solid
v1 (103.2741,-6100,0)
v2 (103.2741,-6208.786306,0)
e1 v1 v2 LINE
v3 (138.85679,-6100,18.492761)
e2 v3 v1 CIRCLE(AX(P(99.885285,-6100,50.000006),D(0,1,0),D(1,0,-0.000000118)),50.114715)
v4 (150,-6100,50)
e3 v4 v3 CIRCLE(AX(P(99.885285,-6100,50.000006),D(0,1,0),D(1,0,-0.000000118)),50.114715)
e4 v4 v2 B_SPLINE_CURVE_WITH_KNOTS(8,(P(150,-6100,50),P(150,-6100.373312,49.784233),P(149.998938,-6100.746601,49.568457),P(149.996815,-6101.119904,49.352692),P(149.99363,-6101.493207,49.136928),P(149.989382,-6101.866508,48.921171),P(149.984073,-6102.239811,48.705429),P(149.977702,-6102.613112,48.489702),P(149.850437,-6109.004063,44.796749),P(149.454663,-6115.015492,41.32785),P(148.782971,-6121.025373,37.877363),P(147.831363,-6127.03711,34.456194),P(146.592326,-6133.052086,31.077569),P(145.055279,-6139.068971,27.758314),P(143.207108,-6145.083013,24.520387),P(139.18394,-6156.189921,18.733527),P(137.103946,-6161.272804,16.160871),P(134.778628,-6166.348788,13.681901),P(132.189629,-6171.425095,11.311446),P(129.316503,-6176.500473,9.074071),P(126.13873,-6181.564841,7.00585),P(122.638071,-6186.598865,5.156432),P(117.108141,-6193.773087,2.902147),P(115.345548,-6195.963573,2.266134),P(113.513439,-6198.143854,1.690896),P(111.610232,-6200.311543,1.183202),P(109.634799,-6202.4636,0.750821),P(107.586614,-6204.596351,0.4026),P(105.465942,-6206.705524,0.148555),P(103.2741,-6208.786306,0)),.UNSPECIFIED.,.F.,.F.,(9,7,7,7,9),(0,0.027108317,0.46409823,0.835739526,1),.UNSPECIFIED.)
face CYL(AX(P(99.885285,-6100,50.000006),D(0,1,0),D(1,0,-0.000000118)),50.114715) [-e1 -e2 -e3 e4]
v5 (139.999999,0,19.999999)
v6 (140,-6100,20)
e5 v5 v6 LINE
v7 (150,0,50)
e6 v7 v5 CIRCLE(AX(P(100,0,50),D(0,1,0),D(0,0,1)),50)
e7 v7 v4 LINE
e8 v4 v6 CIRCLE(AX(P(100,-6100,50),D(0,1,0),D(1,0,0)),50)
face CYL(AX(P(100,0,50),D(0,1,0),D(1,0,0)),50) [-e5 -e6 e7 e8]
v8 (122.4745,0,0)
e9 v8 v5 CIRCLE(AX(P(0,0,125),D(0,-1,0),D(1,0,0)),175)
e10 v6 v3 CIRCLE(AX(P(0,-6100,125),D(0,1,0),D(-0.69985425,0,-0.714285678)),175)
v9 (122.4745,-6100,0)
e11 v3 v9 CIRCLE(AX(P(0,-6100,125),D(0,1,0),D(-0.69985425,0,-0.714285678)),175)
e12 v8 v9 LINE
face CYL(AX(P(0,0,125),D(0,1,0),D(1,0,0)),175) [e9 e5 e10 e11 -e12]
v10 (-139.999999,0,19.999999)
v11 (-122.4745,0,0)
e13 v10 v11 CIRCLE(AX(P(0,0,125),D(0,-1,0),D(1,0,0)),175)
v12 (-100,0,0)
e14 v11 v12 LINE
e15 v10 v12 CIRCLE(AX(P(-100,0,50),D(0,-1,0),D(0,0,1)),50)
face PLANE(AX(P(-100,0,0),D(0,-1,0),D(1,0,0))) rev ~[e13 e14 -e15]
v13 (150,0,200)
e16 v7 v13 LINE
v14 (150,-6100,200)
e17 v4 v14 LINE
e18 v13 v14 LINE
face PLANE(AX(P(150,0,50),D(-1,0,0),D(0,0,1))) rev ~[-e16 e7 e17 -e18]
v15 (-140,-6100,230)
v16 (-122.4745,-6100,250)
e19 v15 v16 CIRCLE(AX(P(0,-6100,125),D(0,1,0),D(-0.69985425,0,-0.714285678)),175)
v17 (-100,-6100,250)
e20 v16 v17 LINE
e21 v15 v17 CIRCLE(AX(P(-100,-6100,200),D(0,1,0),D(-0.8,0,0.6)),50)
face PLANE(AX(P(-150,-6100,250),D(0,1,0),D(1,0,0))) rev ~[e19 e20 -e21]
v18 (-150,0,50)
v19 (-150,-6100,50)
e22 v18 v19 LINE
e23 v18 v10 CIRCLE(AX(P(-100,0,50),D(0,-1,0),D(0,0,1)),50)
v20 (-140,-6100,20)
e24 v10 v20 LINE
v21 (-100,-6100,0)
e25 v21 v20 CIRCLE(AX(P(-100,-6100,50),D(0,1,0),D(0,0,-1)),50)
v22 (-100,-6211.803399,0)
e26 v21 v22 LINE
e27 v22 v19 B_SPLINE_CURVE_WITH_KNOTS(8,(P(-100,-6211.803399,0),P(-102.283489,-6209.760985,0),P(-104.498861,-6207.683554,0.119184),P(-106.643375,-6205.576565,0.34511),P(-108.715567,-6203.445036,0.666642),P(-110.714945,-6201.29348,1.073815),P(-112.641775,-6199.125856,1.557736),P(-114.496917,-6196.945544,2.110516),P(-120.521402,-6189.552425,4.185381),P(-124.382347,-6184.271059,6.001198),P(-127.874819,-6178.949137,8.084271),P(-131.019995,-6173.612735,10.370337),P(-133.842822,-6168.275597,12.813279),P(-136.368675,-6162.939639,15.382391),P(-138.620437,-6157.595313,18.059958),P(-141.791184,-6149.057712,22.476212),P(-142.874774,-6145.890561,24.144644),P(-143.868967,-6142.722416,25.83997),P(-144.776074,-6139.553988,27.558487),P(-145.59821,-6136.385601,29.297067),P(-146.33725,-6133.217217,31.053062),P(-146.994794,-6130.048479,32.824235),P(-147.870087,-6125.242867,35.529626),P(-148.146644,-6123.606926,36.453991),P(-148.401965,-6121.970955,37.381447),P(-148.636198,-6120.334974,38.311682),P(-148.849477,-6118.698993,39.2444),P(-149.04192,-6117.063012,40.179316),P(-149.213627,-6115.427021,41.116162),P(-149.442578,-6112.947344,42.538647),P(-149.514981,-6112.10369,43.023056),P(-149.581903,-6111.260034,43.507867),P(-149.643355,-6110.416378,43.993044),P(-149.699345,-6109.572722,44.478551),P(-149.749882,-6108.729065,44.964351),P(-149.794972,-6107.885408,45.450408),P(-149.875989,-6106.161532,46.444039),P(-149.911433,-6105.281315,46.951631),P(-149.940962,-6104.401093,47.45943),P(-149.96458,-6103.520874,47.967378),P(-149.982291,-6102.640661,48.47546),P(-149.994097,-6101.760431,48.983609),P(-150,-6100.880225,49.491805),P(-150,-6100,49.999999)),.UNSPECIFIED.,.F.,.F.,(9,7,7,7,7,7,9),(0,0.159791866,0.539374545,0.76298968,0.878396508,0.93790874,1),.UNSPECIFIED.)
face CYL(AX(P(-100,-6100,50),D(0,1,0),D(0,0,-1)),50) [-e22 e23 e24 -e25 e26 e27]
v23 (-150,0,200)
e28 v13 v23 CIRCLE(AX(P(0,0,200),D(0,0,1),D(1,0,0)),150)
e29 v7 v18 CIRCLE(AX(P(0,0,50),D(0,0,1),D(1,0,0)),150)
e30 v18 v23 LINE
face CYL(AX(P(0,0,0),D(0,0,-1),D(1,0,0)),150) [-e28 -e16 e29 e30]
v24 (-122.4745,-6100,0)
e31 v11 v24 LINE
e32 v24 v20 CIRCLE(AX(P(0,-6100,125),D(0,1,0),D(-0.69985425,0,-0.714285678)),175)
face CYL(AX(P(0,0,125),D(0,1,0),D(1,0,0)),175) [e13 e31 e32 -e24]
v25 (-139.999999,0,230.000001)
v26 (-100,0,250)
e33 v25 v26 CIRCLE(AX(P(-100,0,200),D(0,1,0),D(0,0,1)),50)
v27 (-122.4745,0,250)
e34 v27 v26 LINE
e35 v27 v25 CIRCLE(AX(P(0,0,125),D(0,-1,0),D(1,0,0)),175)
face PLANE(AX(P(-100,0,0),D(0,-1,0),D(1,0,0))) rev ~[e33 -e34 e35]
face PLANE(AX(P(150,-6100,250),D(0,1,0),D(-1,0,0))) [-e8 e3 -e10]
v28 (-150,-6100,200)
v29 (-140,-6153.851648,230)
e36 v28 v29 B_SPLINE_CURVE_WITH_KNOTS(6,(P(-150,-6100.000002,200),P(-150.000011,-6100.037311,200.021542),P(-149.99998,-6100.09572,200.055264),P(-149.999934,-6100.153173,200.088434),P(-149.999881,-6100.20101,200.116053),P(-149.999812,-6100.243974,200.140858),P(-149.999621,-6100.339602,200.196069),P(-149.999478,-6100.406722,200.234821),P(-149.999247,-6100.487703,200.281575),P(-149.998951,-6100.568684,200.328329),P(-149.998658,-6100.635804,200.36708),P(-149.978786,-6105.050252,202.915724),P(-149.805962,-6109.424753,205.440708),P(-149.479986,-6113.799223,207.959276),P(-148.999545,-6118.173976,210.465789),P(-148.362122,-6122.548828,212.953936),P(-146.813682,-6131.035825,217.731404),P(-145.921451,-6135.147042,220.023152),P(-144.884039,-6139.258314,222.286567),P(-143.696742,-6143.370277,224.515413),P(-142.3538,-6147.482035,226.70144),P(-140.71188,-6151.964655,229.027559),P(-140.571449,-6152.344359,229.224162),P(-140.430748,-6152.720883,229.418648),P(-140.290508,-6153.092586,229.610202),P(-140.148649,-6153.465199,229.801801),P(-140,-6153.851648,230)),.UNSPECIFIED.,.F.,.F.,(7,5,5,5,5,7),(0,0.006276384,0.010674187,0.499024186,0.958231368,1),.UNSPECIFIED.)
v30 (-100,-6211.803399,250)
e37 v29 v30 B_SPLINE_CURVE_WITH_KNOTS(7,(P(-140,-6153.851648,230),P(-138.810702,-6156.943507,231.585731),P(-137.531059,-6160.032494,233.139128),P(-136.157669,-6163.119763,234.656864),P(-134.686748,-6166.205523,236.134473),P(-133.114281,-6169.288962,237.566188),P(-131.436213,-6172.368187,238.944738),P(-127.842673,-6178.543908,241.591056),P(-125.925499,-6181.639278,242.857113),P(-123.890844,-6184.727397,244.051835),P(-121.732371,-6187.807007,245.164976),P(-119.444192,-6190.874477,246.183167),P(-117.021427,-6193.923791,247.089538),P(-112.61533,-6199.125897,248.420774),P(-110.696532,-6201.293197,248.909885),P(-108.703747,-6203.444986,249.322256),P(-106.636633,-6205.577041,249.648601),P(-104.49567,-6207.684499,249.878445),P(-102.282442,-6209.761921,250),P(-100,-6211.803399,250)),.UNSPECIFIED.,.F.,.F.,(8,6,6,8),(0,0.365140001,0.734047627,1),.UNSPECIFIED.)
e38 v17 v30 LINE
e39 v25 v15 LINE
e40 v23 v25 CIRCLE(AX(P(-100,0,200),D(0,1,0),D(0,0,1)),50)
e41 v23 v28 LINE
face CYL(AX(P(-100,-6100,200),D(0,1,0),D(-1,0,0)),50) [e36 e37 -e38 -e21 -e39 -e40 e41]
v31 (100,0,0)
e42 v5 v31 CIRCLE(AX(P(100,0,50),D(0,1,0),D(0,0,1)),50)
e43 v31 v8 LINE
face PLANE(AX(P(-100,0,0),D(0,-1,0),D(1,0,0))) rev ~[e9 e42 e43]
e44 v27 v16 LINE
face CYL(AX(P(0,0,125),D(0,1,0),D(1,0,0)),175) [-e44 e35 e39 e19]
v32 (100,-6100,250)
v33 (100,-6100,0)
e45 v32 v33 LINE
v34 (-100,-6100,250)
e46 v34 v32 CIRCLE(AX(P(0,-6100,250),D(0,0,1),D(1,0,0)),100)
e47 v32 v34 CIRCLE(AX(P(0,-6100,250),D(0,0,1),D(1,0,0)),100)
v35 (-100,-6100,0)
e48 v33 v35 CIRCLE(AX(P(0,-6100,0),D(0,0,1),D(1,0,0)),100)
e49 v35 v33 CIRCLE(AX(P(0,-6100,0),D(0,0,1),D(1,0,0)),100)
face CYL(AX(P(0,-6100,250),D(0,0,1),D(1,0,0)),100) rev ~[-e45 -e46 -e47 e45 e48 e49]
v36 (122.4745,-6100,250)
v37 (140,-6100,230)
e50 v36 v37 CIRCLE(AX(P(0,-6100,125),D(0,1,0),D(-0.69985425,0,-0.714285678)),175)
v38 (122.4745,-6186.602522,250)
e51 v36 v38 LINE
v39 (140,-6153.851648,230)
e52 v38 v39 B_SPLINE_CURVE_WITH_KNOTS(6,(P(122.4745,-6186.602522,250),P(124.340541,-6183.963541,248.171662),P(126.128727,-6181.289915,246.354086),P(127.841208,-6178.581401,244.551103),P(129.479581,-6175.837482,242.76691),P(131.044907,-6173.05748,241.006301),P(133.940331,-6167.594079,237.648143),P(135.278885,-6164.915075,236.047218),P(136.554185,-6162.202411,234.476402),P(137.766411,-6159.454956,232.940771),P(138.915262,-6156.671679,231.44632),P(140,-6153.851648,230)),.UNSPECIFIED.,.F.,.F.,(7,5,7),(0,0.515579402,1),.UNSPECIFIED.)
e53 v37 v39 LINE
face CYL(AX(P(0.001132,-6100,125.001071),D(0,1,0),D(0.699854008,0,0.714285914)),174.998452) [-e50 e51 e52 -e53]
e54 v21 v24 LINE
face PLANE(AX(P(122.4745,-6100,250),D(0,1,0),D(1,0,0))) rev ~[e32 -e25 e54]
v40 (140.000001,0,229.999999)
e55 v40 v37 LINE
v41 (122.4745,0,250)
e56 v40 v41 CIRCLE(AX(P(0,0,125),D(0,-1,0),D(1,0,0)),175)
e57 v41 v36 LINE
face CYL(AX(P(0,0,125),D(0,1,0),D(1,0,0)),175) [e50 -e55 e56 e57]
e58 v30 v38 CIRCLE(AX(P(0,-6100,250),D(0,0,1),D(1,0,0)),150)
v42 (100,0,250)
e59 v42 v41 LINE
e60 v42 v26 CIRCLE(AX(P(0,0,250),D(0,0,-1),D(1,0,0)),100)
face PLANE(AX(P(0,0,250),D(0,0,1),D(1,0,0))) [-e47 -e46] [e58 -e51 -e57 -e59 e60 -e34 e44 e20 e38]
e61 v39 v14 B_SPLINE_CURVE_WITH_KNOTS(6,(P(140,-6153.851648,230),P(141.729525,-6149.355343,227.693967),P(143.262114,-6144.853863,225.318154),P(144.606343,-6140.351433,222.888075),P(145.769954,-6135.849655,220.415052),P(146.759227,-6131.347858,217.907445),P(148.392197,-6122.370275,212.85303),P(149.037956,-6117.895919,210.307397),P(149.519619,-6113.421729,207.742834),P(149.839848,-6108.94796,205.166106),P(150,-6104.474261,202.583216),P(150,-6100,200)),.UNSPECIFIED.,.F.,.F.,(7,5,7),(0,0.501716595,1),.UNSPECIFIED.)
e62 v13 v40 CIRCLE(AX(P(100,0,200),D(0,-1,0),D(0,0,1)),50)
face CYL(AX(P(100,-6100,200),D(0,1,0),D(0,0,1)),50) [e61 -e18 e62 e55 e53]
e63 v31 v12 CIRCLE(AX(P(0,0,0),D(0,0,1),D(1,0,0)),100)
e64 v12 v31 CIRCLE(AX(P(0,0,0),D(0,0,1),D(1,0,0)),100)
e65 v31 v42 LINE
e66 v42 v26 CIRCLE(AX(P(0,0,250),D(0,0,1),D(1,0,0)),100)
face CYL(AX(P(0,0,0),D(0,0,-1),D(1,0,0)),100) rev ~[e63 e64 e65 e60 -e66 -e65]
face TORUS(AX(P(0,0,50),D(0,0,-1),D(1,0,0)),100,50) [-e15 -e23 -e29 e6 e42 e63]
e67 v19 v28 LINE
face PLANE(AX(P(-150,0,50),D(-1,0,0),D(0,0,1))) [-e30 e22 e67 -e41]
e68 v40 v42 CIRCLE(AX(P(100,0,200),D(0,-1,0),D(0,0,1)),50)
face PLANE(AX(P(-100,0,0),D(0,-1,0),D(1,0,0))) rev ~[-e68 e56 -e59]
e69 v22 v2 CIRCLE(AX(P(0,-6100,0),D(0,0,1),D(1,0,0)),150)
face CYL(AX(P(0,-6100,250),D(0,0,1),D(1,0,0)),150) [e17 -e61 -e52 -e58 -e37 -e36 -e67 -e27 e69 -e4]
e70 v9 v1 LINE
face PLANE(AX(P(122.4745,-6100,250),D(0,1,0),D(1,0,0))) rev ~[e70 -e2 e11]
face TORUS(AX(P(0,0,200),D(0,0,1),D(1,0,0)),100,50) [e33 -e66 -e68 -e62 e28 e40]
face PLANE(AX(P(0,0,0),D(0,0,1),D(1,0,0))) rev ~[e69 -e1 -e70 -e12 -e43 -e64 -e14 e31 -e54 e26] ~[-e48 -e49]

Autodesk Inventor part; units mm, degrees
ref_plane "YZ Plane" through (0, 0, 0) normal (1, 0, 0) x (0, 1, 0)
ref_plane "XZ Plane" through (0, 0, 0) normal (0, 1, 0) x (-1, 0, 0)
ref_plane "XY Plane" through (0, 0, 0) normal (0, 0, 1) x (1, 0, 0)
sketch "Skizze1" plane through (0, 0, 0) normal (0, 0, 1) x (1, 0, 0)
  line L0 (-210, 0) -> (210, 0) construction
  line L1 (0, -150) -> (0, 200) construction
  arc A0 (150, 0) -> (-150, 0) centre (0, 0) ccw
  line L2 (-150, 0) -> (150, 0)
  circle A1 centre (0, 0) radius 100
  dimension "d14" = 200
sketch "Skizze2" plane through (0, 0, 0) normal (0, 0, 1) x (1, 0, 0)
  point P0 (0, 0)
extrude "Extrusion1" add sketch "Skizze1" along normal blind 250 contours L2 A1 A0 | L2 A1 picked at (21.5157, 33.3544)
fillet "Rundung1" radius 50 2 edges at (0, 150, 250) (0, 150, 0)
sketch "Skizze3" plane through (-100, 0, 0) normal (0, -1, 0) x (1, 0, 0)
  circle A0 centre (100, 125) radius 175
  point P0 (100, 0)
  dimension "d4" = 350
extrude "Extrusion2" add sketch "Skizze3" along normal blind 6100
fillet "Rundung2" [suppressed]
sketch "Skizze4" plane through (-100, 0, 0) normal (0, 1, 0) x (1, 0, 0)
  circle A0 centre (100, -125) radius 175 projected
  arc A1 (-22.4745, 0) -> (100, 50) centre (100, -125) ccw
  arc A2 (222.4745, 0) -> (-22.4745, 0) centre (100, -125) ccw
  line L0 (-22.4745, 0) -> (222.4745, 0)
  line L1 (0, 0) -> (200, 0) projected
  arc A3 (-22.4745, -250) -> (222.4745, -250) centre (100, -125) ccw
  line L2 (-22.4745, -250) -> (222.4745, -250)
  line L3 (200, -250) -> (0, -250) projected
  point P0 (100, 0)
  point P1 (-22.4745, -250)
extrude "Extrusion3" cut sketch "Skizze4" against normal blind 6100 contours L0 A0
extrude "Extrusion4" cut sketch "Skizze4" against normal blind 6100 contours A0 L2
sketch "Skizze5" plane through (-100, 0, 0) normal (0, 1, 0) x (1, 0, 0)
  arc A0 (240, -230) -> (240, -20) centre (100, -125) ccw projected
  arc A1 (250, -50) -> (240, -20) centre (200, -50) ccw projected
  arc A2 (240, -230) -> (240, -20) centre (100, -125) ccw
  line L0 (250, -50) -> (-50, -50) projected
  arc A3 (240, -230) -> (250, -200) centre (200, -200) ccw projected
  line L1 (250, -50) -> (250, -200)
  line L2 (250, -50) -> (250, -200) projected
  arc A4 (240, -230) -> (250, -200) centre (200, -200) ccw
  line L3 (100, 0) -> (100, -250)
  line L4 (200, -250) -> (0, -250) projected
  arc A5 (0, 0) -> (-40, -20) centre (0, -50) ccw projected
  arc A6 (-40, -20) -> (-40, -230) centre (100, -125) ccw projected
  arc A7 (-40, -20) -> (-40, -230) centre (100, -125) ccw
  line L5 (-50, -200) -> (250, -200) projected
  line L6 (-50, -50) -> (-50, -200)
  arc A8 (-40, -20) -> (-50, -50) centre (0, -50) ccw projected
  arc A9 (-40, -20) -> (-50, -50) centre (0, -50) ccw
  line L7 (-50, -50) -> (-50, -200) projected
  arc A10 (-50, -200) -> (-40, -230) centre (0, -200) ccw projected
  arc A11 (-50, -200) -> (-40, -230) centre (0, -200) ccw
extrude "Extrusion5" cut sketch "Skizze5" against normal blind 6100 contours A3 L1 A1 A0 | A10 A6 A8 L6
extrude "Extrusion6" cut sketch "Skizze1" along normal blind 6100 contours A1 L2 | L2 A1
sketch "Skizze6" plane through (0, 0, 250) normal (0, 0, 1) x (1, 0, 0)
  circle A0 centre (0, -6100) radius 150
  circle A1 centre (0, -6100) radius 100
  line L0 (150, -6100) -> (-150, -6100)
  line L1 (-122.4745, -6100) -> (122.4745, -6100) projected
  line L2 (201.0424, -6100) -> (-326.8055, -6100)
  circle A2 centre (0, -6100) radius 100
  point P0 (0, 0)
  point P1 (-100, -6100)
  point P2 (100, -6100)
  dimension "d17" = 300
  dimension "d18" = 200
extrude "Extrusion7" add sketch "Skizze6" against normal blind 250 contours A0 L0 A1 picked at (-121.6685, -6120.1193)
sketch "Skizze7" plane through (-150, -6100, 250) normal (0, 1, 0) x (1, 0, 0)
  line L0 (27.5255, 0) -> (50, 0) projected
  line L1 (27.5255, 0) -> (0, 0) projected
  line L2 (27.5255, 0) -> (0, 0)
  line L3 (0, 0) -> (0, 50) projected
  line L4 (0, 0) -> (0, 50)
  arc A0 (0, 50) -> (10, 20) centre (50, 50) ccw projected
  arc A1 (10, 20) -> (50, 0) centre (50, 50) ccw projected
  arc A2 (0, 50) -> (50, 0) centre (50, 50) ccw
  line L5 (250, 0) -> (50, 0) projected
  line L6 (27.5255, 0) -> (50, 0)
  point P0 (150, 250)
extrude "Extrusion8" cut sketch "Skizze7" against normal blind 250
sketch "Skizze8" plane through (122.4745, -6100, 250) normal (0, 1, 0) x (1, 0, 0)
  arc A0 (0, 0) -> (17.5255, 20) centre (-122.4745, 125) ccw projected
  line L0 (27.5255, 0) -> (0, 0) projected
  line L1 (0, 0) -> (27.5255, 0)
  line L2 (27.5255, 0) -> (27.5255, 50) projected
  line L3 (27.5255, 0) -> (27.5255, 50)
  arc A1 (-22.4745, 0) -> (17.5255, 20) centre (-22.4745, 50) ccw projected
  arc A2 (-22.4745, 0) -> (27.5255, 50) centre (-22.4745, 50) ccw
  line L4 (27.5255, 200) -> (27.5255, 250) projected
  line L5 (27.5255, 200) -> (27.5255, 250)
  line L6 (27.5255, 250) -> (-19.2004, 250)
  line L7 (27.5255, 250) -> (-272.4745, 250) projected
  line L8 (27.5255, 200) -> (27.5255, 50) projected
  arc A3 (27.5255, 200) -> (-19.2004, 250) centre (-22.5892, 200) ccw
  line L9 (-272.4745, 200) -> (-272.4745, 250) projected
  line L10 (-272.4745, 200) -> (-272.4745, 250)
  arc A4 (-262.4745, 230) -> (-272.4745, 200) centre (-222.4745, 200) ccw projected
  arc A5 (-222.4745, 250) -> (-262.4745, 230) centre (-222.4745, 200) ccw projected
  line L11 (-272.4745, 250) -> (-222.4745, 250)
  arc A6 (-222.4745, 250) -> (-272.4745, 200) centre (-222.4745, 200) ccw
  line L12 (27.5255, 200) -> (27.5255, 250)
  point P0 (-122.4745, 250)
  point P1 (17.5255, 20)
extrude "Extrusion9" cut sketch "Skizze8" against normal blind 250
extrude "Extrusion10" cut sketch "Skizze6" against normal through all contours L0 A1 picked at (-30.5737, -6077.6422)
properties part number "Metallstange"
